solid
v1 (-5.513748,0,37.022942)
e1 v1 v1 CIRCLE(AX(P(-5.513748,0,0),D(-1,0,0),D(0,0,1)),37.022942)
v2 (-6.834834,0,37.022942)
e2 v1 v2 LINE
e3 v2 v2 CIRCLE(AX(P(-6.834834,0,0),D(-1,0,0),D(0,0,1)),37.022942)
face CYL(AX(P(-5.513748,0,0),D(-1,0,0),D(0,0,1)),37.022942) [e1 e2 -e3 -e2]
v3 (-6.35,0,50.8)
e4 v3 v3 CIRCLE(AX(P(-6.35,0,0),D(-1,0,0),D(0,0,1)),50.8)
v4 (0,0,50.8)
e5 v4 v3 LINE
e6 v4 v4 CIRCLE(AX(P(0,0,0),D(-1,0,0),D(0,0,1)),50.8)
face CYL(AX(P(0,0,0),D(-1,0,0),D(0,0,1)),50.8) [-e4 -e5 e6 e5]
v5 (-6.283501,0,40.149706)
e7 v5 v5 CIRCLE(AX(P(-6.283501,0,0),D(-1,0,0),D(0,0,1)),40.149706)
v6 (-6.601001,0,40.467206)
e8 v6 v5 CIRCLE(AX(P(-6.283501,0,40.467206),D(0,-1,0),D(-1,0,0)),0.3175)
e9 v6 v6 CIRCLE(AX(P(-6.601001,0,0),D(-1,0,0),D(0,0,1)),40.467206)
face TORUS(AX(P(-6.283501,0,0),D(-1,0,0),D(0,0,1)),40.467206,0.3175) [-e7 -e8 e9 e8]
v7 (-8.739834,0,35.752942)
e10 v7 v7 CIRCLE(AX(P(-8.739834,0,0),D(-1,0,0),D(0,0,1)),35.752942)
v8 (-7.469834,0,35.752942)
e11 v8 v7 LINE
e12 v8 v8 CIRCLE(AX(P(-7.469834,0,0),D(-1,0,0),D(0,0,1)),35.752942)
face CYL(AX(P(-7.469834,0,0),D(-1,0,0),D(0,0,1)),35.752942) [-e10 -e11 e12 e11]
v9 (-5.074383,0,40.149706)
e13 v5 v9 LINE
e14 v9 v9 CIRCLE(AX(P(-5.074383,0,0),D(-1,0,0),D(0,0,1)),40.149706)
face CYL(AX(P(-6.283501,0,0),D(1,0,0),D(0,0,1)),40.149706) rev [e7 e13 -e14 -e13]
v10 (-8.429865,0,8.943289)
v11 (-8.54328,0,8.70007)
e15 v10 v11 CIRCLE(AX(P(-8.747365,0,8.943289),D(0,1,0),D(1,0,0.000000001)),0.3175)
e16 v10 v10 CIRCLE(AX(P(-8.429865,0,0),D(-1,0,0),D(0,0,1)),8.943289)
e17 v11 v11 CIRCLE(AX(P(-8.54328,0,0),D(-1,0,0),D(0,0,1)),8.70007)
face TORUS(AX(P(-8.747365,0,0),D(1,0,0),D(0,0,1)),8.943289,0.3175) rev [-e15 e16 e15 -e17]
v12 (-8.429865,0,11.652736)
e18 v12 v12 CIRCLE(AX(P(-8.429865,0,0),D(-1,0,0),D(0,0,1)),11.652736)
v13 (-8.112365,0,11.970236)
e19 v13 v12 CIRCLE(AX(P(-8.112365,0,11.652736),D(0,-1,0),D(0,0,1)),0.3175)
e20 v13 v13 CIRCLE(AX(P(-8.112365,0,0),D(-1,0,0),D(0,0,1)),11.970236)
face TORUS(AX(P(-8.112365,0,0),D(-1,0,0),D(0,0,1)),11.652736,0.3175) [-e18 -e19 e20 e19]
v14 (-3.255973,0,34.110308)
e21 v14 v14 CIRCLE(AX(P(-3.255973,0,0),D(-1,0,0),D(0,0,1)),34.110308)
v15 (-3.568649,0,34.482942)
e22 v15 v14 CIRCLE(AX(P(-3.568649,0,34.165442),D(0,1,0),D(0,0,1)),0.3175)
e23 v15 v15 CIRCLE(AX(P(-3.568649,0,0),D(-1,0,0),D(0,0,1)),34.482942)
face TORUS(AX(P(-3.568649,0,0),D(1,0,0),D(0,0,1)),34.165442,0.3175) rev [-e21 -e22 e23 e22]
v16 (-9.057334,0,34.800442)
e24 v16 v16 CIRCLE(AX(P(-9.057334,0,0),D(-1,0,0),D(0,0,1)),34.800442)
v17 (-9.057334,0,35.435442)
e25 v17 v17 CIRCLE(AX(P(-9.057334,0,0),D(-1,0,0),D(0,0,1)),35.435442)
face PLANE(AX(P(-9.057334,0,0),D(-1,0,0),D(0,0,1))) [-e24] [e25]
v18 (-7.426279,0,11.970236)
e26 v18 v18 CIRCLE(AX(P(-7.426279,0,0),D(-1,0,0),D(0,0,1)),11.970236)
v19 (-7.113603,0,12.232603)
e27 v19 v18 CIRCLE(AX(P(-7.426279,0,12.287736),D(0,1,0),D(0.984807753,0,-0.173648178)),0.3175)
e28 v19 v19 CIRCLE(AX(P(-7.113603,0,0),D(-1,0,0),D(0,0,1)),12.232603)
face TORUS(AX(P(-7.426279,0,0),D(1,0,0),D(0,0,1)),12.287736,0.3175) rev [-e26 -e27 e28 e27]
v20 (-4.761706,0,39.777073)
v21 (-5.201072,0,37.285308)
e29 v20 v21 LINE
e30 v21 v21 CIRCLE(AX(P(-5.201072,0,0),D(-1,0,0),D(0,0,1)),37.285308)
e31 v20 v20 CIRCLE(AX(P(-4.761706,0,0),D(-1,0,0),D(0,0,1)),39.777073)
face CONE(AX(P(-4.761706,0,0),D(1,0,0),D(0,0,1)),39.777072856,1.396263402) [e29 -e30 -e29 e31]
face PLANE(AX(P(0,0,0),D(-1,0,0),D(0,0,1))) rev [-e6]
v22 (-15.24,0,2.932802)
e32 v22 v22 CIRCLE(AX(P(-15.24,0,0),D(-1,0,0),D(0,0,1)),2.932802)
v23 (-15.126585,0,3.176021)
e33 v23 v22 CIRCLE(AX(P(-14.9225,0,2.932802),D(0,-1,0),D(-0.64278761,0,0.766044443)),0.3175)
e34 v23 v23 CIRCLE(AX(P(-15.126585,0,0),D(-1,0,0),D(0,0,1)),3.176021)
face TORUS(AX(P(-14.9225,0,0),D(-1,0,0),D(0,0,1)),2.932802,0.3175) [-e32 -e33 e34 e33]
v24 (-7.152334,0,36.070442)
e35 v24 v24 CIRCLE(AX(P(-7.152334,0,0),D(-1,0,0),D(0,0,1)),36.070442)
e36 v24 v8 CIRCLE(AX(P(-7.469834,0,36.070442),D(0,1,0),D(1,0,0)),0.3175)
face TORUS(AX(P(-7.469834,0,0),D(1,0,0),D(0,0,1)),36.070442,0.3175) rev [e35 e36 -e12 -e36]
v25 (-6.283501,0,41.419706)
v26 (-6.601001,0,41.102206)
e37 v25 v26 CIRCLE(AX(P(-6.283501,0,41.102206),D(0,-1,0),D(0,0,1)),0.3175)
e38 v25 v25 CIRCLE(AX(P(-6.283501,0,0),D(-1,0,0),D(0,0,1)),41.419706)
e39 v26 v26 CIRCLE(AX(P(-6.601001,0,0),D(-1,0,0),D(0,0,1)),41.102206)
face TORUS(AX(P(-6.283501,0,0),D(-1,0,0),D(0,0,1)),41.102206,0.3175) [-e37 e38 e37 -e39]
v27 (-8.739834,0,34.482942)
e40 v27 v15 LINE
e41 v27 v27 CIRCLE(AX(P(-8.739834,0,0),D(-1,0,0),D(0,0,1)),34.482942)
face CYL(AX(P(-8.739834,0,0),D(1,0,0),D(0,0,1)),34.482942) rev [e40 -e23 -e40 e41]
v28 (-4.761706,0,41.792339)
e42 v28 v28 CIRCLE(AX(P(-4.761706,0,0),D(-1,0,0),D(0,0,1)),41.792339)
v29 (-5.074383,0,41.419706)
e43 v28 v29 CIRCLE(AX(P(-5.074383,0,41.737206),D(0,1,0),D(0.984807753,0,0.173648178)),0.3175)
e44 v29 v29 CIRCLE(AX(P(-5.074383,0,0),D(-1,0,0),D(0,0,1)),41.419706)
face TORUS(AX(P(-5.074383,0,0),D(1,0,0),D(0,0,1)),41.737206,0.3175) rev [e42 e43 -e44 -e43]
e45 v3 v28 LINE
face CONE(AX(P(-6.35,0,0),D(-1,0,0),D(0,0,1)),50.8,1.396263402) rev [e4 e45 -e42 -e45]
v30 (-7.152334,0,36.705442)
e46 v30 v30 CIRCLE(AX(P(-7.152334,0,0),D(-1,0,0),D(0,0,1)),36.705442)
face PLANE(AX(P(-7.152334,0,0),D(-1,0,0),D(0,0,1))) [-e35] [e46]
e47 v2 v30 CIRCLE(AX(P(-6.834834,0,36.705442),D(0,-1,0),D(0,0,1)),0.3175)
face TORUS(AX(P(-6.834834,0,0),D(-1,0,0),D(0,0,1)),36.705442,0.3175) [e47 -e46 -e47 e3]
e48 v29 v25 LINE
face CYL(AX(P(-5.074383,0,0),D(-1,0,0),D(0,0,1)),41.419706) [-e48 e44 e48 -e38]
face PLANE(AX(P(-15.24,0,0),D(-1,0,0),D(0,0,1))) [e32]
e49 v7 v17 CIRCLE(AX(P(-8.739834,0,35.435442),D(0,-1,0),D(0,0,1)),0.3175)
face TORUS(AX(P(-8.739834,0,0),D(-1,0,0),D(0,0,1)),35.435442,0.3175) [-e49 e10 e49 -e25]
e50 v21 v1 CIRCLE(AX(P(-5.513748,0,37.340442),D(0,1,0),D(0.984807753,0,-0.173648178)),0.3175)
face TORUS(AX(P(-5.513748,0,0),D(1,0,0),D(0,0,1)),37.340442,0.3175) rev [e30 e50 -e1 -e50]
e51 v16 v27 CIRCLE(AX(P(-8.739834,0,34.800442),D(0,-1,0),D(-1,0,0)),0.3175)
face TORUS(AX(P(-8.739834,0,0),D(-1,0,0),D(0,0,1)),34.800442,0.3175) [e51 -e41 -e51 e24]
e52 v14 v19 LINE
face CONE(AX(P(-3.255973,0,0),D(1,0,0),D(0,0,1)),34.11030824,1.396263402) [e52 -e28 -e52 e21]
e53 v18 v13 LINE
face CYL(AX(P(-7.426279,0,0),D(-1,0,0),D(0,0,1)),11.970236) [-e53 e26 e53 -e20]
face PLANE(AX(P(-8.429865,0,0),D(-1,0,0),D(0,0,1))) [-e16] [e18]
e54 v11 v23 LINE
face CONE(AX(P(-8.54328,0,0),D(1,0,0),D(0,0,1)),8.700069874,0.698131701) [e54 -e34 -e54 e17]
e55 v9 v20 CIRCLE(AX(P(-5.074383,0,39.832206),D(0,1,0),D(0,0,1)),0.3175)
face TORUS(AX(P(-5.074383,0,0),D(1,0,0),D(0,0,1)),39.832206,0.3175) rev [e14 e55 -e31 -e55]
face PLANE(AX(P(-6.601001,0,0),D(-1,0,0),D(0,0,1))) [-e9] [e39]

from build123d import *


# Not quite as in the source:
# - a feature of the source that left no trace in its solid (it failed there, or was rolled back) is left out


with BuildPart() as f1:
    # F0 (on Front) → F1 (revolve)
    with BuildSketch(Plane.XZ):
        with BuildLine():
            Line((-15.24, 0), (0, 0))
            Line((0, 0), (0, 50.8))
            Line((0, 50.8), (-6.35, 50.8))
            Line((-6.35, 50.8), (-4.7617064118, 41.792339449))
            ThreePointArc((-4.7617064118, 41.792339449), (-4.8311637627, 41.5331210865), (-5.0743828734, 41.4197061526))
            Line((-5.0743828734, 41.4197061526), (-6.2835011077, 41.4197061526))
            ThreePointArc((-6.2835011077, 41.4197061526), (-6.5080075107, 41.3267125556), (-6.6010011077, 41.1022061526))
            Line((-6.6010011077, 41.1022061526), (-6.6010011077, 40.4672061526))
            ThreePointArc((-6.6010011077, 40.4672061526), (-6.5080075107, 40.2426997495), (-6.2835011077, 40.1497061526))
            Line((-6.2835011077, 40.1497061526), (-5.0743828734, 40.1497061526))
            ThreePointArc((-5.0743828734, 40.1497061526), (-4.8311637627, 40.0362912186), (-4.7617064118, 39.7770728561))
            Line((-4.7617064118, 39.7770728561), (-5.2010717431, 37.2853082403))
            ThreePointArc((-5.2010717431, 37.2853082403), (-5.3096631386, 37.0972224261), (-5.5137482047, 37.0229415367))
            Line((-5.5137482047, 37.0229415367), (-6.8348340718, 37.0229415367))
            ThreePointArc((-6.8348340718, 37.0229415367), (-7.0593404748, 36.9299479398), (-7.1523340718, 36.7054415367))
            Line((-7.1523340718, 36.7054415367), (-7.1523340718, 36.0704415367))
            ThreePointArc((-7.1523340718, 36.0704415367), (-7.2453276688, 35.8459351337), (-7.4698340718, 35.7529415367))
            Line((-7.4698340718, 35.7529415367), (-8.7398340718, 35.7529415367))
            ThreePointArc((-8.7398340718, 35.7529415367), (-8.9643404748, 35.6599479398), (-9.0573340718, 35.4354415367))
            Line((-9.0573340718, 35.4354415367), (-9.0573340718, 34.8004415367))
            ThreePointArc((-9.0573340718, 34.8004415367), (-8.9643404748, 34.5759351337), (-8.7398340718, 34.4829415367))
            Line((-8.7398340718, 34.4829415367), (-3.5686493249, 34.4829415367))
            ThreePointArc((-3.5686493249, 34.4829415367), (-3.3254302142, 34.3695266028), (-3.2559728633, 34.1103082403))
            Line((-3.2559728633, 34.1103082403), (-7.113602572, 12.2326030065))
            ThreePointArc((-7.113602572, 12.2326030065), (-7.2221939675, 12.0445171922), (-7.4262790336, 11.9702363029))
            Line((-7.4262790336, 11.9702363029), (-8.1123649007, 11.9702363029))
            ThreePointArc((-8.1123649007, 11.9702363029), (-8.3368713037, 11.8772427059), (-8.4298649007, 11.6527363029))
            Line((-8.4298649007, 11.6527363029), (-8.4298649007, 8.9432889844))
            ThreePointArc((-8.4298649007, 8.9432889844), (-8.4596121783, 8.8091076862), (-8.5432798346, 8.7000698737))
            Line((-8.5432798346, 8.7000698737), (-15.1265850661, 3.176020882))
            ThreePointArc((-15.1265850661, 3.176020882), (-15.2102527224, 3.0669830694), (-15.24, 2.9328017713))
            Line((-15.24, 2.9328017713), (-15.24, 0))
        make_face()
    revolve(axis=Axis((-7.62, 0, 0), (-1, 0, 0)))


solid = f1.part
